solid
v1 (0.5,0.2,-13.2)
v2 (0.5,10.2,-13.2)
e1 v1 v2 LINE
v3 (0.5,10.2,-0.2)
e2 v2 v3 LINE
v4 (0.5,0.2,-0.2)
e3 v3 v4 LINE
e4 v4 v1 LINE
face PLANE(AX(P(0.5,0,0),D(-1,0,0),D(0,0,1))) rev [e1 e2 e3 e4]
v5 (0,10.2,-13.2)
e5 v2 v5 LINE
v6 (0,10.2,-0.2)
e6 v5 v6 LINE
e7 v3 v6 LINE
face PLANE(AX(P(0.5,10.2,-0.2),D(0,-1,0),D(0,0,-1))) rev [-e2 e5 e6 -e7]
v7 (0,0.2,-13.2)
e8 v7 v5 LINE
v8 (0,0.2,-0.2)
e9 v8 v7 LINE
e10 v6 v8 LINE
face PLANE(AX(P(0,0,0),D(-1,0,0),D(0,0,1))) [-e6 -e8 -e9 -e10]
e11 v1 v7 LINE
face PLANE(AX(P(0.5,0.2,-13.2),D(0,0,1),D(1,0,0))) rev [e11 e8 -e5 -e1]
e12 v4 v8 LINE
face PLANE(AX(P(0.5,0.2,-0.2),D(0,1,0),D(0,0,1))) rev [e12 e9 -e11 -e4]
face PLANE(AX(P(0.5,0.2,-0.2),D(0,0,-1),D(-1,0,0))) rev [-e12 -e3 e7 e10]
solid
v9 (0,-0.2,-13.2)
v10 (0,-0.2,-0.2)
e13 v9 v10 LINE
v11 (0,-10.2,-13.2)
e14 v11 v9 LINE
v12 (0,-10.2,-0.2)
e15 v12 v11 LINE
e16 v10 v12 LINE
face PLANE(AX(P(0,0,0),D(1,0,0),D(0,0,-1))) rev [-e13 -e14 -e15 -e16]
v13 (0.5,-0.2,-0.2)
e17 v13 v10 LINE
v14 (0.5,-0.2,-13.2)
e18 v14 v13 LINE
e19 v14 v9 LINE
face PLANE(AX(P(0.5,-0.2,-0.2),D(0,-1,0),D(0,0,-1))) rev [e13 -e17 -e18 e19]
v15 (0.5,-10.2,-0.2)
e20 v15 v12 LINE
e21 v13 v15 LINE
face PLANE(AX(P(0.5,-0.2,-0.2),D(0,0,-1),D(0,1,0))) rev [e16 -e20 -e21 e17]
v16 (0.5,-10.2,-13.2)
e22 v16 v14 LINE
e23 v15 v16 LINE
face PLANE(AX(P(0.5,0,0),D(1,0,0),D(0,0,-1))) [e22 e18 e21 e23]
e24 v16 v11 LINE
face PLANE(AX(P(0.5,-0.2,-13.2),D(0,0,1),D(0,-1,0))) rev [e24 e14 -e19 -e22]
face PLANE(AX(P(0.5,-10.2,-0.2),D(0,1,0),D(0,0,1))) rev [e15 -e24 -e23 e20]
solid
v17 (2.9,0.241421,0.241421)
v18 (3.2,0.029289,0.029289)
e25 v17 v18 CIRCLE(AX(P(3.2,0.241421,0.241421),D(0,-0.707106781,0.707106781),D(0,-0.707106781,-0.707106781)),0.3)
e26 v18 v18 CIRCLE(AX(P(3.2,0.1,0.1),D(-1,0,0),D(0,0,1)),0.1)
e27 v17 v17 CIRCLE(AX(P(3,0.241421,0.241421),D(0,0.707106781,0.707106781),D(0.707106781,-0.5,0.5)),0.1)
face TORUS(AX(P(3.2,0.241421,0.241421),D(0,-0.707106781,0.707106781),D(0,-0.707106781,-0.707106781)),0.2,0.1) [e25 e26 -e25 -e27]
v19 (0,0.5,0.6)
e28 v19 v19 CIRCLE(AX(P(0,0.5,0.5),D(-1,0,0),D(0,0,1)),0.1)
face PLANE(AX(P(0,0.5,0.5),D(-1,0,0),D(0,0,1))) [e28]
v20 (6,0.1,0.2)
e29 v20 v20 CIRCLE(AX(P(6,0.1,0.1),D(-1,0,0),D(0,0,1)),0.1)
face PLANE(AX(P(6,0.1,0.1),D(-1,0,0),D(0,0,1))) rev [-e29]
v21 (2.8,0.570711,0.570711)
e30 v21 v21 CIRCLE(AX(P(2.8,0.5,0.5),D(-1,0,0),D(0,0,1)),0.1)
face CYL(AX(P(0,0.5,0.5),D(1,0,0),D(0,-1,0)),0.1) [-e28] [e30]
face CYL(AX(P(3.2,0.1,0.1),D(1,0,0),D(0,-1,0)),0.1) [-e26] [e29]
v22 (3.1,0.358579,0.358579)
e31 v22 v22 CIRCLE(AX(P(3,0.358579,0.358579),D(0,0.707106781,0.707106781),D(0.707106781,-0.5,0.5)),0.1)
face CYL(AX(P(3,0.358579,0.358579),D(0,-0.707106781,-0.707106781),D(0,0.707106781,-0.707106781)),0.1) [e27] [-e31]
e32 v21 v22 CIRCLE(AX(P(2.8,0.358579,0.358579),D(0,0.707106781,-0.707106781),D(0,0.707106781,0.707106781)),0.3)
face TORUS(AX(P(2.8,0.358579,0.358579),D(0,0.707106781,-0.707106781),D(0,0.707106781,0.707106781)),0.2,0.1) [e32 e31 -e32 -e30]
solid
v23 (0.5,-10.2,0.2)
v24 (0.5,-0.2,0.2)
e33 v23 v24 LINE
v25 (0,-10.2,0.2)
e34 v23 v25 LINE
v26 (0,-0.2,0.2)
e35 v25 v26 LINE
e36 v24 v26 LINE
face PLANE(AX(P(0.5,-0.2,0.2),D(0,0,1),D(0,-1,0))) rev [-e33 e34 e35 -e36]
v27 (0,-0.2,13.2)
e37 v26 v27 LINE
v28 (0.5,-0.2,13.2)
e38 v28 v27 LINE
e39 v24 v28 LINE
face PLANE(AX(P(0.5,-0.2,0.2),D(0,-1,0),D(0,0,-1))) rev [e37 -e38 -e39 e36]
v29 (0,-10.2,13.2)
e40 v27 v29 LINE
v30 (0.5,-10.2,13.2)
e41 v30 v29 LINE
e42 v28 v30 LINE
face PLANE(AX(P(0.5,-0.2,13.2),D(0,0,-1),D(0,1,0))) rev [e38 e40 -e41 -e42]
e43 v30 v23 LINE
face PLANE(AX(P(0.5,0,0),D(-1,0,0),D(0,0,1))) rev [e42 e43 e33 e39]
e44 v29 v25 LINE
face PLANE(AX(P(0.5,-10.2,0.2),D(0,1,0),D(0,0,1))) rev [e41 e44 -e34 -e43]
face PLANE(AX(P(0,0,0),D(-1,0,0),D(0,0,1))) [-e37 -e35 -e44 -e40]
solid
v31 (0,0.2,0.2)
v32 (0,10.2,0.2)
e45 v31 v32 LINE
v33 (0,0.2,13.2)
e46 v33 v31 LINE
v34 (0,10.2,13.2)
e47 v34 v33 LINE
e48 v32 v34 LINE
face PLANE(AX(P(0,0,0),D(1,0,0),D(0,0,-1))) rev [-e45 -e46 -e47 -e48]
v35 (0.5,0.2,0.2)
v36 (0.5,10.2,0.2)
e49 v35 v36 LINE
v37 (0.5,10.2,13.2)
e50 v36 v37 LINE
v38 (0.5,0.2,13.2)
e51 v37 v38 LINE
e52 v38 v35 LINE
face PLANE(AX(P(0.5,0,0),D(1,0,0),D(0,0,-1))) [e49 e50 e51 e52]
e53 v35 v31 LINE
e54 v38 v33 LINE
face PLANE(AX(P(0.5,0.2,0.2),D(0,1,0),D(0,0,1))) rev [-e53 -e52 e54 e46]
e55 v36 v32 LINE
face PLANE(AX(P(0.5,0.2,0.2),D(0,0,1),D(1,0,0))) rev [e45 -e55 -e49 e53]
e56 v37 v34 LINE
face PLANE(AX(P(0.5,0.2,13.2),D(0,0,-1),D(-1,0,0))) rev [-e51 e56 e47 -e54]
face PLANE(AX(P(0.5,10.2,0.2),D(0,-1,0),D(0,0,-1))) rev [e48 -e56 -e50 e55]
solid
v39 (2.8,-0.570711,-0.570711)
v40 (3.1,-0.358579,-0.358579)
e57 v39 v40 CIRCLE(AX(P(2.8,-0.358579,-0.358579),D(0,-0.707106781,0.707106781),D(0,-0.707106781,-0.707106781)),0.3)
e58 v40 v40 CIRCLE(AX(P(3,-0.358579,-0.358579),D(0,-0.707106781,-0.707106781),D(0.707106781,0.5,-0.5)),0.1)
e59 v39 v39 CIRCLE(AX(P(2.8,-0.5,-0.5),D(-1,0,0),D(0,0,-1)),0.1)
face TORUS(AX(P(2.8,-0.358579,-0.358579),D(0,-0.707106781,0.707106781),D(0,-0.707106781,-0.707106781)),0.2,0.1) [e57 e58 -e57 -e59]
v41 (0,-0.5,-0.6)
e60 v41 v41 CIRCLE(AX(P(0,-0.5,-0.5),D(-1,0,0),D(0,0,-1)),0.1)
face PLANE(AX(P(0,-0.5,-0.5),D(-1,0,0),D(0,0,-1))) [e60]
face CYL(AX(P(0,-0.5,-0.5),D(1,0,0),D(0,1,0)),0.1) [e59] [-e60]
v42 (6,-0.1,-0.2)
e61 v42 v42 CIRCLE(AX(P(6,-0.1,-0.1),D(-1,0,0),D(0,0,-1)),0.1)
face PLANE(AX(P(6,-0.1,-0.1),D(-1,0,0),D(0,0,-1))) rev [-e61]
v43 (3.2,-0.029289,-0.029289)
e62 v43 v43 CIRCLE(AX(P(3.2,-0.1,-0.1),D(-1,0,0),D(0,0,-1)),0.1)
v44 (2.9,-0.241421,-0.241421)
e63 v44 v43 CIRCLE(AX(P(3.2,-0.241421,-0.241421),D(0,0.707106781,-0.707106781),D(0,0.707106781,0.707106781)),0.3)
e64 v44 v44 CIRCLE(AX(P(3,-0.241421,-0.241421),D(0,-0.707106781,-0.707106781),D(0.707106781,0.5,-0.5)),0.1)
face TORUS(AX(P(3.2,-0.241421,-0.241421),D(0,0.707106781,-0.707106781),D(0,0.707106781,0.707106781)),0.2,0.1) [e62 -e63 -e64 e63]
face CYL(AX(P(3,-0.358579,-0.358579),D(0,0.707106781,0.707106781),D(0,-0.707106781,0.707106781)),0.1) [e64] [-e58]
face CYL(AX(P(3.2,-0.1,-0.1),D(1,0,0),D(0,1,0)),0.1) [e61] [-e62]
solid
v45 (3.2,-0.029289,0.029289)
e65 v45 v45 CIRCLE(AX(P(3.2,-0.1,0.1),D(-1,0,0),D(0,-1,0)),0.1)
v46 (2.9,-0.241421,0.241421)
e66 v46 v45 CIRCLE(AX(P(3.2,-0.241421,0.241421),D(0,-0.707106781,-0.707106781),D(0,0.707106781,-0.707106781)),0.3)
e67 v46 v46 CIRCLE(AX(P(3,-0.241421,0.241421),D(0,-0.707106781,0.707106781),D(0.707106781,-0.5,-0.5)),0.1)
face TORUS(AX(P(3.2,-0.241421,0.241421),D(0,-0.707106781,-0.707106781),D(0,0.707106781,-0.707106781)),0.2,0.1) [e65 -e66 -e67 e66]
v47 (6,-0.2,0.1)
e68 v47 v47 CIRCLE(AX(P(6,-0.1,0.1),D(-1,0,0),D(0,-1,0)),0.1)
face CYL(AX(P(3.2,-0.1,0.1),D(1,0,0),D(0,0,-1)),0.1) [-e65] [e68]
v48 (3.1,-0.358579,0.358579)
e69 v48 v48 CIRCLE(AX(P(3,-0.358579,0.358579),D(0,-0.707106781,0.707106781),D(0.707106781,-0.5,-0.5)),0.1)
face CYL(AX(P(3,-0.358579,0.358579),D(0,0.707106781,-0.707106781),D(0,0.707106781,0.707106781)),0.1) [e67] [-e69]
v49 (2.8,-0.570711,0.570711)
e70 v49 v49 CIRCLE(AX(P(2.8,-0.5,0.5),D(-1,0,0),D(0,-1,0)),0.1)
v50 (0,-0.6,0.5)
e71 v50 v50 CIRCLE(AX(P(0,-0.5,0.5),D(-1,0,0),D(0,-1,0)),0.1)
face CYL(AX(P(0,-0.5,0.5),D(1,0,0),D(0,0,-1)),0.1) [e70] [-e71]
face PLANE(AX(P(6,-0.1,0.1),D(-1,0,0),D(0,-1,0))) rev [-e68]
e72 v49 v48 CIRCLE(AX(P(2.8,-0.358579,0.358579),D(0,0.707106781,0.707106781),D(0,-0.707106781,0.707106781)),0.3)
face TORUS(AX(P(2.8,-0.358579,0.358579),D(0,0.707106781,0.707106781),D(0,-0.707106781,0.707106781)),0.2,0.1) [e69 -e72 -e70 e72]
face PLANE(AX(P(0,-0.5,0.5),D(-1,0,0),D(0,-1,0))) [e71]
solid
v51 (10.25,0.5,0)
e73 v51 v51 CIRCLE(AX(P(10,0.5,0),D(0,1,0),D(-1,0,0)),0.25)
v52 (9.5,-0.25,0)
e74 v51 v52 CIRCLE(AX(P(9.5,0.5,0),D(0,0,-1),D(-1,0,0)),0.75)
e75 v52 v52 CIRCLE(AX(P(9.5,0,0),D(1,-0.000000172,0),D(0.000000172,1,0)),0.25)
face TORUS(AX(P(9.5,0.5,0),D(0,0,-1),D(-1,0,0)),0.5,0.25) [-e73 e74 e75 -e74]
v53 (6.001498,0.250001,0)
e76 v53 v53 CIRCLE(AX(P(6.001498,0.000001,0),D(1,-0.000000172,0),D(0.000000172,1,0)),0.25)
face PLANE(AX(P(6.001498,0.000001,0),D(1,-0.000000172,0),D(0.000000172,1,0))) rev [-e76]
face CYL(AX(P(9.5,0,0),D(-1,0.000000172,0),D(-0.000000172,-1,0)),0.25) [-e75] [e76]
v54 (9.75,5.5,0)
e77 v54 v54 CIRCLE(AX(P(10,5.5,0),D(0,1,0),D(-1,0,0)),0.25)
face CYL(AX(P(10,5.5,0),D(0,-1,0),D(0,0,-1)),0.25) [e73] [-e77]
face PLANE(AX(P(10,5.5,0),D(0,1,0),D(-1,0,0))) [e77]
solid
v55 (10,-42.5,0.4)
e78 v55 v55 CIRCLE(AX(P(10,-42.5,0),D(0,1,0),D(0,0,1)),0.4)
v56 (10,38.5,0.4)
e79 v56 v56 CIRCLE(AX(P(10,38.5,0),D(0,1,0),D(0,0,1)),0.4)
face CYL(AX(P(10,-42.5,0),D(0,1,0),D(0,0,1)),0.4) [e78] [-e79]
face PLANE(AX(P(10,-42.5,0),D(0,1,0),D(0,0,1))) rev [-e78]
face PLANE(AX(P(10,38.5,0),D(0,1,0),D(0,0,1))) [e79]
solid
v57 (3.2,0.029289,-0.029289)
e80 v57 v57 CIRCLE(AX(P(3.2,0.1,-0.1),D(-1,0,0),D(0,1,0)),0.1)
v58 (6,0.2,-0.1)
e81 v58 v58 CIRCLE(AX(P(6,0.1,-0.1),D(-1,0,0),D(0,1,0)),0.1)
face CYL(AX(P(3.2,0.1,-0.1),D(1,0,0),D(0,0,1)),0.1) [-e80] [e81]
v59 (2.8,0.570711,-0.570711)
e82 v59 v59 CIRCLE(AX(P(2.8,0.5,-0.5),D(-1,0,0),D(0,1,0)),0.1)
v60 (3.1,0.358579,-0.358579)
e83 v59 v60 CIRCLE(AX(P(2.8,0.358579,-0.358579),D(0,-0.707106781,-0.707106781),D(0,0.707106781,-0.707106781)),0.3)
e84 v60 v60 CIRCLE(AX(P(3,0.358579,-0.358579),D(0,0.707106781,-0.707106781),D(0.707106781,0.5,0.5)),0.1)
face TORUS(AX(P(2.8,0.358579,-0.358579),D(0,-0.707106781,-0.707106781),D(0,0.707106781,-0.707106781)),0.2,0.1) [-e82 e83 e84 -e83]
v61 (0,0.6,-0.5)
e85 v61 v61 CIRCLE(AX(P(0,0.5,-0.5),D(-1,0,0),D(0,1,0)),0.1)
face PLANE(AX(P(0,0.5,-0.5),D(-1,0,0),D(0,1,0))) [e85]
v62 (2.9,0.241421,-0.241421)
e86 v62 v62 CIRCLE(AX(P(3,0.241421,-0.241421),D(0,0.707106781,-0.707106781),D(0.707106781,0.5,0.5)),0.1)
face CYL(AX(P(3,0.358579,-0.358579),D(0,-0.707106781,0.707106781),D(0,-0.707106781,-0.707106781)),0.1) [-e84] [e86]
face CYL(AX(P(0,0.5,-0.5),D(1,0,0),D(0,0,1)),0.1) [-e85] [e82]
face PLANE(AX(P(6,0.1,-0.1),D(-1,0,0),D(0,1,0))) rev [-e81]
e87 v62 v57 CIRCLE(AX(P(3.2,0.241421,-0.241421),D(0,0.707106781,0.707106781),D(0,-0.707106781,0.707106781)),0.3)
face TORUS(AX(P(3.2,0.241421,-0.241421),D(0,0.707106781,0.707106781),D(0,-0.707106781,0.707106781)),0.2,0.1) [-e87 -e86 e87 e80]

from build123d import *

# Parameters (mm, degrees)
SKETCH_3_W               = 13
SKETCH_3_H               = 10
EXTRUDE_1_DEPTH          = 0.5
EXTRUDE_1_2_DEPTH        = 0.5
EXTRUDE_1_3_DEPTH        = 0.5
EXTRUDE_1_4_DEPTH        = 0.5
SWEEP_4_PROFILE_R        = 0.1
SWEEP_6_PROFILE_R        = 0.25
SWEEP_8_PROFILE_R        = 0.4
MOVE_BODY_3_OUTLINE_R    = 0.1
MOVE_BODY_3_ANGLE        = 90
MOVE_BODY_3_2_OUTLINE_R  = 0.1
MOVE_BODY_3_2_ANGLE      = 90
MOVE_BODY_3_3_OUTLINE_R  = 0.1
MOVE_BODY_3_3_DEPTH      = 2.8000001
MOVE_START               = 0.341421256
MOVE_BODY_3_4_OUTLINE_R  = 0.1
MOVE_BODY_3_4_DEPTH      = 0.165685625
MOVE_START_2             = 3.1999999
MOVE_BODY_3_5_OUTLINE_R  = 0.1
MOVE_BODY_3_5_DEPTH      = 2.8000001
MOVE_BODY_3_6_OUTLINE_R  = 0.1
MOVE_BODY_3_6_ANGLE      = 90
MOVE_BODY_3_7_OUTLINE_R  = 0.1
MOVE_BODY_3_7_ANGLE      = 90
MOVE_BODY_3_8_OUTLINE_R  = 0.1
MOVE_BODY_3_8_DEPTH      = 2.8000001
MOVE_BODY_3_9_OUTLINE_R  = 0.1
MOVE_BODY_3_9_DEPTH      = 0.165685625
MOVE_BODY_3_10_OUTLINE_R = 0.1
MOVE_BODY_3_10_DEPTH     = 2.8000001
MOVE_BODY_3_11_OUTLINE_R = 0.1
MOVE_BODY_3_11_ANGLE     = 90
MOVE_BODY_3_12_OUTLINE_R = 0.1
MOVE_BODY_3_12_ANGLE     = 90
MOVE_BODY_3_13_OUTLINE_R = 0.1
MOVE_BODY_3_13_DEPTH     = 2.8000001
MOVE_START_3             = -0.507106881
MOVE_BODY_3_14_OUTLINE_R = 0.1
MOVE_BODY_3_14_DEPTH     = 0.165685625
MOVE_BODY_3_15_OUTLINE_R = 0.1
MOVE_BODY_3_15_DEPTH     = 2.8000001


with BuildPart() as part:
    # 草图3 → 凸台-拉伸1 (new body)
    with BuildSketch(Plane(origin=(0, 0, 0), x_dir=(0, 0, -1), z_dir=(1, 0, 0))):
        with Locations((6.7, 5.2)):
            Rectangle(SKETCH_3_W, SKETCH_3_H)
    extrude(amount=EXTRUDE_1_DEPTH)


with BuildPart() as body_2:
    # 草图3 → Extrude 1 2 (new body)
    with BuildSketch(Plane(origin=(0, 0, 0), x_dir=(0, 0, -1), z_dir=(1, 0, 0))):
        with Locations((-6.7, -5.2)):
            Rectangle(SKETCH_3_W, SKETCH_3_H)
    extrude(amount=EXTRUDE_1_2_DEPTH)


with BuildPart() as body_3:
    # 草图3 → Extrude 1 3 (new body)
    with BuildSketch(Plane(origin=(0, 0, 0), x_dir=(0, 0, -1), z_dir=(1, 0, 0))):
        with Locations((6.7, -5.2)):
            Rectangle(SKETCH_3_W, SKETCH_3_H)
    extrude(amount=EXTRUDE_1_3_DEPTH)


with BuildPart() as body_4:
    # 草图3 → Extrude 1 4 (new body)
    with BuildSketch(Plane(origin=(0, 0, 0), x_dir=(0, 0, -1), z_dir=(1, 0, 0))):
        with Locations((-6.7, 5.2)):
            Rectangle(SKETCH_3_W, SKETCH_3_H)
    extrude(amount=EXTRUDE_1_4_DEPTH)


with BuildPart() as body_5:
    # 扫描4: sweep along a curve in space
    with BuildLine() as sweep_4_path:
        Line((0, -0.5, 0.5), (2.8, -0.5, 0.5))
        ThreePointArc((2.8, -0.5, 0.5), (2.941421356, -0.458578644, 0.458578644), (3, -0.358578644, 0.358578644))
        Line((3, -0.241421356, 0.241421356), (3, -0.358578644, 0.358578644))
        ThreePointArc((3.2, -0.1, 0.1), (3.058578644, -0.141421356, 0.141421356), (3, -0.241421356, 0.241421356))
        Line((3.2, -0.1, 0.1), (6, -0.1, 0.1))
    # 扫描4 profile (on start of the path) → 扫描4 (sweep)
    with BuildSketch(Plane(origin=(0, -0.5, 0.5), x_dir=(0, 0, 1), z_dir=(1, 0, 0))):
        Circle(SWEEP_4_PROFILE_R)
    sweep(path=sweep_4_path.line)


with BuildPart() as body_6:
    # 扫描6: sweep along a path in 草图31
    with BuildLine(Plane.XY) as sweep_6_path:
        Line((10, 5.5), (10, 0.5))
        ThreePointArc((10, 0.5), (9.85355336, 0.146446579), (9.499999914, 0))
        Line((9.499999914, 0), (6.001497631, 6.02e-07))
    # 扫描6 profile (on start of the path) → 扫描6 (sweep)
    with BuildSketch(Plane(origin=(10, 5.5, 0), x_dir=(0, 0, -1), z_dir=(0, -1, 0))):
        Circle(SWEEP_6_PROFILE_R)
    sweep(path=sweep_6_path.line)


with BuildPart() as body_7:
    # 扫描8: sweep along a path in 草图39
    with BuildLine(Plane.XY) as sweep_8_path:
        Line((10, -42.5), (10, 38.5))
    # 扫描8 profile (on start of the path) → 扫描8 (sweep)
    with BuildSketch(Plane(origin=(10, -42.5, 0), x_dir=(0, 0, 1), z_dir=(0, 1, 0))):
        Circle(SWEEP_8_PROFILE_R)
    sweep(path=sweep_8_path.line)


with BuildPart() as body_8:
    # Move Body 3: read off the stored shape, not the designer's step
    # Move Body 3 outline → Move Body 3 (revolve)
    with BuildSketch(Plane(origin=(2.8, 0.358578644, 0.358578644), x_dir=(0, 0.7071067811865401, 0.7071067811865551), z_dir=(-1, 0, 0))):
        with Locations((0.2, 0)):
            Circle(MOVE_BODY_3_OUTLINE_R)
    revolve(axis=Axis((2.8, 0.358578644, 0.358578644), (0, 0.7071067811865555, -0.7071067811865405)), revolution_arc=MOVE_BODY_3_ANGLE)

    # Move Body 3 2 outline → Move Body 3 2 (revolve)
    with BuildSketch(Plane(origin=(3.2, 0.241421356, 0.241421356), x_dir=(1.3934999695075554e-15, -0.7071067811865401, -0.7071067811865551), z_dir=(1, 0, 0))):
        with Locations((0.2, 0)):
            Circle(MOVE_BODY_3_2_OUTLINE_R)
    revolve(axis=Axis((3.2, 0.241421356, 0.241421356), (0, 0.7071067811865555, -0.7071067811865405)), revolution_arc=MOVE_BODY_3_2_ANGLE)

    # Move Body 3 3 outline → Move Body 3 3 (add)
    with BuildSketch(Plane.YZ):
        with Locations((0.5, 0.5)):
            Circle(MOVE_BODY_3_3_OUTLINE_R)
    extrude(amount=MOVE_BODY_3_3_DEPTH)

    # Move Body 3 4 outline → Move Body 3 4 (add)
    with BuildSketch(Plane(origin=(0, 0, 0), x_dir=(1, 0, 0), z_dir=(0, 0.70710678118654, 0.707106781186555)).offset(MOVE_START)):
        with Locations((3, 0)):
            Circle(MOVE_BODY_3_4_OUTLINE_R)
    extrude(amount=MOVE_BODY_3_4_DEPTH)

    # Move Body 3 5 outline → Move Body 3 5 (add)
    with BuildSketch(Plane.YZ.offset(MOVE_START_2)):
        with Locations((0.1, 0.1)):
            Circle(MOVE_BODY_3_5_OUTLINE_R)
    extrude(amount=MOVE_BODY_3_5_DEPTH)


with BuildPart() as body_9:
    # Move Body 3 6 outline → Move Body 3 6 (revolve)
    with BuildSketch(Plane(origin=(2.8, 0.358578644, -0.358578644), x_dir=(1, 0, 0), z_dir=(0, -0.707106781186552, 0.707106781186543))):
        with Locations((0.2, 0)):
            Circle(MOVE_BODY_3_6_OUTLINE_R)
    revolve(axis=Axis((2.8, 0.358578644, -0.358578644), (0, 0.707106781186543, 0.707106781186552)), revolution_arc=MOVE_BODY_3_6_ANGLE)

    # Move Body 3 7 outline → Move Body 3 7 (revolve)
    with BuildSketch(Plane(origin=(3.2, 0.241421356, -0.241421356), x_dir=(-1, 0, 0), z_dir=(-1.0106430996148604e-15, 0.707106781186552, -0.707106781186543))):
        with Locations((0.2, 0)):
            Circle(MOVE_BODY_3_7_OUTLINE_R)
    revolve(axis=Axis((3.2, 0.241421356, -0.241421356), (0, 0.707106781186543, 0.707106781186552)), revolution_arc=MOVE_BODY_3_7_ANGLE)

    # Move Body 3 8 outline → Move Body 3 8 (add)
    with BuildSketch(Plane.YZ):
        with Locations((0.5, -0.5)):
            Circle(MOVE_BODY_3_8_OUTLINE_R)
    extrude(amount=MOVE_BODY_3_8_DEPTH)

    # Move Body 3 9 outline → Move Body 3 9 (add)
    with BuildSketch(Plane(origin=(0, 0, 0), x_dir=(1, 0, 0), z_dir=(0, 0.707106781186552, -0.707106781186543)).offset(MOVE_START)):
        with Locations((3, 0)):
            Circle(MOVE_BODY_3_9_OUTLINE_R)
    extrude(amount=MOVE_BODY_3_9_DEPTH)

    # Move Body 3 10 outline → Move Body 3 10 (add)
    with BuildSketch(Plane.YZ.offset(MOVE_START_2)):
        with Locations((0.1, -0.1)):
            Circle(MOVE_BODY_3_10_OUTLINE_R)
    extrude(amount=MOVE_BODY_3_10_DEPTH)


with BuildPart() as body_10:
    # Move Body 3 11 outline → Move Body 3 11 (revolve)
    with BuildSketch(Plane(origin=(2.8, -0.358578644, -0.358578644), x_dir=(1, 0, 0), z_dir=(0, 0.707106781186545, 0.70710678118655))):
        with Locations((0.2, 0)):
            Circle(MOVE_BODY_3_11_OUTLINE_R)
    revolve(axis=Axis((2.8, -0.358578644, -0.358578644), (0, 0.70710678118655, -0.707106781186545)), revolution_arc=MOVE_BODY_3_11_ANGLE)

    # Move Body 3 12 outline → Move Body 3 12 (revolve)
    with BuildSketch(Plane(origin=(3.2, -0.241421356, -0.241421356), x_dir=(-1, 0, 0), z_dir=(-1.0106430996148606e-15, -0.707106781186545, -0.70710678118655))):
        with Locations((0.2, 0)):
            Circle(MOVE_BODY_3_12_OUTLINE_R)
    revolve(axis=Axis((3.2, -0.241421356, -0.241421356), (0, 0.70710678118655, -0.707106781186545)), revolution_arc=MOVE_BODY_3_12_ANGLE)

    # Move Body 3 13 outline → Move Body 3 13 (add)
    with BuildSketch(Plane.YZ):
        with Locations((-0.5, -0.5)):
            Circle(MOVE_BODY_3_13_OUTLINE_R)
    extrude(amount=MOVE_BODY_3_13_DEPTH)

    # Move Body 3 14 outline → Move Body 3 14 (add)
    with BuildSketch(Plane(origin=(0, 0, 0), x_dir=(1, 0, 0), z_dir=(0, 0.707106781186545, 0.70710678118655)).offset(MOVE_START_3)):
        with Locations((3, 0)):
            Circle(MOVE_BODY_3_14_OUTLINE_R)
    extrude(amount=MOVE_BODY_3_14_DEPTH)

    # Move Body 3 15 outline → Move Body 3 15 (add)
    with BuildSketch(Plane.YZ.offset(MOVE_START_2)):
        with Locations((-0.1, -0.1)):
            Circle(MOVE_BODY_3_15_OUTLINE_R)
    extrude(amount=MOVE_BODY_3_15_DEPTH)


solid = Compound([part.part, body_2.part, body_3.part, body_4.part, body_5.part, body_6.part, body_7.part, body_8.part, body_9.part, body_10.part])
